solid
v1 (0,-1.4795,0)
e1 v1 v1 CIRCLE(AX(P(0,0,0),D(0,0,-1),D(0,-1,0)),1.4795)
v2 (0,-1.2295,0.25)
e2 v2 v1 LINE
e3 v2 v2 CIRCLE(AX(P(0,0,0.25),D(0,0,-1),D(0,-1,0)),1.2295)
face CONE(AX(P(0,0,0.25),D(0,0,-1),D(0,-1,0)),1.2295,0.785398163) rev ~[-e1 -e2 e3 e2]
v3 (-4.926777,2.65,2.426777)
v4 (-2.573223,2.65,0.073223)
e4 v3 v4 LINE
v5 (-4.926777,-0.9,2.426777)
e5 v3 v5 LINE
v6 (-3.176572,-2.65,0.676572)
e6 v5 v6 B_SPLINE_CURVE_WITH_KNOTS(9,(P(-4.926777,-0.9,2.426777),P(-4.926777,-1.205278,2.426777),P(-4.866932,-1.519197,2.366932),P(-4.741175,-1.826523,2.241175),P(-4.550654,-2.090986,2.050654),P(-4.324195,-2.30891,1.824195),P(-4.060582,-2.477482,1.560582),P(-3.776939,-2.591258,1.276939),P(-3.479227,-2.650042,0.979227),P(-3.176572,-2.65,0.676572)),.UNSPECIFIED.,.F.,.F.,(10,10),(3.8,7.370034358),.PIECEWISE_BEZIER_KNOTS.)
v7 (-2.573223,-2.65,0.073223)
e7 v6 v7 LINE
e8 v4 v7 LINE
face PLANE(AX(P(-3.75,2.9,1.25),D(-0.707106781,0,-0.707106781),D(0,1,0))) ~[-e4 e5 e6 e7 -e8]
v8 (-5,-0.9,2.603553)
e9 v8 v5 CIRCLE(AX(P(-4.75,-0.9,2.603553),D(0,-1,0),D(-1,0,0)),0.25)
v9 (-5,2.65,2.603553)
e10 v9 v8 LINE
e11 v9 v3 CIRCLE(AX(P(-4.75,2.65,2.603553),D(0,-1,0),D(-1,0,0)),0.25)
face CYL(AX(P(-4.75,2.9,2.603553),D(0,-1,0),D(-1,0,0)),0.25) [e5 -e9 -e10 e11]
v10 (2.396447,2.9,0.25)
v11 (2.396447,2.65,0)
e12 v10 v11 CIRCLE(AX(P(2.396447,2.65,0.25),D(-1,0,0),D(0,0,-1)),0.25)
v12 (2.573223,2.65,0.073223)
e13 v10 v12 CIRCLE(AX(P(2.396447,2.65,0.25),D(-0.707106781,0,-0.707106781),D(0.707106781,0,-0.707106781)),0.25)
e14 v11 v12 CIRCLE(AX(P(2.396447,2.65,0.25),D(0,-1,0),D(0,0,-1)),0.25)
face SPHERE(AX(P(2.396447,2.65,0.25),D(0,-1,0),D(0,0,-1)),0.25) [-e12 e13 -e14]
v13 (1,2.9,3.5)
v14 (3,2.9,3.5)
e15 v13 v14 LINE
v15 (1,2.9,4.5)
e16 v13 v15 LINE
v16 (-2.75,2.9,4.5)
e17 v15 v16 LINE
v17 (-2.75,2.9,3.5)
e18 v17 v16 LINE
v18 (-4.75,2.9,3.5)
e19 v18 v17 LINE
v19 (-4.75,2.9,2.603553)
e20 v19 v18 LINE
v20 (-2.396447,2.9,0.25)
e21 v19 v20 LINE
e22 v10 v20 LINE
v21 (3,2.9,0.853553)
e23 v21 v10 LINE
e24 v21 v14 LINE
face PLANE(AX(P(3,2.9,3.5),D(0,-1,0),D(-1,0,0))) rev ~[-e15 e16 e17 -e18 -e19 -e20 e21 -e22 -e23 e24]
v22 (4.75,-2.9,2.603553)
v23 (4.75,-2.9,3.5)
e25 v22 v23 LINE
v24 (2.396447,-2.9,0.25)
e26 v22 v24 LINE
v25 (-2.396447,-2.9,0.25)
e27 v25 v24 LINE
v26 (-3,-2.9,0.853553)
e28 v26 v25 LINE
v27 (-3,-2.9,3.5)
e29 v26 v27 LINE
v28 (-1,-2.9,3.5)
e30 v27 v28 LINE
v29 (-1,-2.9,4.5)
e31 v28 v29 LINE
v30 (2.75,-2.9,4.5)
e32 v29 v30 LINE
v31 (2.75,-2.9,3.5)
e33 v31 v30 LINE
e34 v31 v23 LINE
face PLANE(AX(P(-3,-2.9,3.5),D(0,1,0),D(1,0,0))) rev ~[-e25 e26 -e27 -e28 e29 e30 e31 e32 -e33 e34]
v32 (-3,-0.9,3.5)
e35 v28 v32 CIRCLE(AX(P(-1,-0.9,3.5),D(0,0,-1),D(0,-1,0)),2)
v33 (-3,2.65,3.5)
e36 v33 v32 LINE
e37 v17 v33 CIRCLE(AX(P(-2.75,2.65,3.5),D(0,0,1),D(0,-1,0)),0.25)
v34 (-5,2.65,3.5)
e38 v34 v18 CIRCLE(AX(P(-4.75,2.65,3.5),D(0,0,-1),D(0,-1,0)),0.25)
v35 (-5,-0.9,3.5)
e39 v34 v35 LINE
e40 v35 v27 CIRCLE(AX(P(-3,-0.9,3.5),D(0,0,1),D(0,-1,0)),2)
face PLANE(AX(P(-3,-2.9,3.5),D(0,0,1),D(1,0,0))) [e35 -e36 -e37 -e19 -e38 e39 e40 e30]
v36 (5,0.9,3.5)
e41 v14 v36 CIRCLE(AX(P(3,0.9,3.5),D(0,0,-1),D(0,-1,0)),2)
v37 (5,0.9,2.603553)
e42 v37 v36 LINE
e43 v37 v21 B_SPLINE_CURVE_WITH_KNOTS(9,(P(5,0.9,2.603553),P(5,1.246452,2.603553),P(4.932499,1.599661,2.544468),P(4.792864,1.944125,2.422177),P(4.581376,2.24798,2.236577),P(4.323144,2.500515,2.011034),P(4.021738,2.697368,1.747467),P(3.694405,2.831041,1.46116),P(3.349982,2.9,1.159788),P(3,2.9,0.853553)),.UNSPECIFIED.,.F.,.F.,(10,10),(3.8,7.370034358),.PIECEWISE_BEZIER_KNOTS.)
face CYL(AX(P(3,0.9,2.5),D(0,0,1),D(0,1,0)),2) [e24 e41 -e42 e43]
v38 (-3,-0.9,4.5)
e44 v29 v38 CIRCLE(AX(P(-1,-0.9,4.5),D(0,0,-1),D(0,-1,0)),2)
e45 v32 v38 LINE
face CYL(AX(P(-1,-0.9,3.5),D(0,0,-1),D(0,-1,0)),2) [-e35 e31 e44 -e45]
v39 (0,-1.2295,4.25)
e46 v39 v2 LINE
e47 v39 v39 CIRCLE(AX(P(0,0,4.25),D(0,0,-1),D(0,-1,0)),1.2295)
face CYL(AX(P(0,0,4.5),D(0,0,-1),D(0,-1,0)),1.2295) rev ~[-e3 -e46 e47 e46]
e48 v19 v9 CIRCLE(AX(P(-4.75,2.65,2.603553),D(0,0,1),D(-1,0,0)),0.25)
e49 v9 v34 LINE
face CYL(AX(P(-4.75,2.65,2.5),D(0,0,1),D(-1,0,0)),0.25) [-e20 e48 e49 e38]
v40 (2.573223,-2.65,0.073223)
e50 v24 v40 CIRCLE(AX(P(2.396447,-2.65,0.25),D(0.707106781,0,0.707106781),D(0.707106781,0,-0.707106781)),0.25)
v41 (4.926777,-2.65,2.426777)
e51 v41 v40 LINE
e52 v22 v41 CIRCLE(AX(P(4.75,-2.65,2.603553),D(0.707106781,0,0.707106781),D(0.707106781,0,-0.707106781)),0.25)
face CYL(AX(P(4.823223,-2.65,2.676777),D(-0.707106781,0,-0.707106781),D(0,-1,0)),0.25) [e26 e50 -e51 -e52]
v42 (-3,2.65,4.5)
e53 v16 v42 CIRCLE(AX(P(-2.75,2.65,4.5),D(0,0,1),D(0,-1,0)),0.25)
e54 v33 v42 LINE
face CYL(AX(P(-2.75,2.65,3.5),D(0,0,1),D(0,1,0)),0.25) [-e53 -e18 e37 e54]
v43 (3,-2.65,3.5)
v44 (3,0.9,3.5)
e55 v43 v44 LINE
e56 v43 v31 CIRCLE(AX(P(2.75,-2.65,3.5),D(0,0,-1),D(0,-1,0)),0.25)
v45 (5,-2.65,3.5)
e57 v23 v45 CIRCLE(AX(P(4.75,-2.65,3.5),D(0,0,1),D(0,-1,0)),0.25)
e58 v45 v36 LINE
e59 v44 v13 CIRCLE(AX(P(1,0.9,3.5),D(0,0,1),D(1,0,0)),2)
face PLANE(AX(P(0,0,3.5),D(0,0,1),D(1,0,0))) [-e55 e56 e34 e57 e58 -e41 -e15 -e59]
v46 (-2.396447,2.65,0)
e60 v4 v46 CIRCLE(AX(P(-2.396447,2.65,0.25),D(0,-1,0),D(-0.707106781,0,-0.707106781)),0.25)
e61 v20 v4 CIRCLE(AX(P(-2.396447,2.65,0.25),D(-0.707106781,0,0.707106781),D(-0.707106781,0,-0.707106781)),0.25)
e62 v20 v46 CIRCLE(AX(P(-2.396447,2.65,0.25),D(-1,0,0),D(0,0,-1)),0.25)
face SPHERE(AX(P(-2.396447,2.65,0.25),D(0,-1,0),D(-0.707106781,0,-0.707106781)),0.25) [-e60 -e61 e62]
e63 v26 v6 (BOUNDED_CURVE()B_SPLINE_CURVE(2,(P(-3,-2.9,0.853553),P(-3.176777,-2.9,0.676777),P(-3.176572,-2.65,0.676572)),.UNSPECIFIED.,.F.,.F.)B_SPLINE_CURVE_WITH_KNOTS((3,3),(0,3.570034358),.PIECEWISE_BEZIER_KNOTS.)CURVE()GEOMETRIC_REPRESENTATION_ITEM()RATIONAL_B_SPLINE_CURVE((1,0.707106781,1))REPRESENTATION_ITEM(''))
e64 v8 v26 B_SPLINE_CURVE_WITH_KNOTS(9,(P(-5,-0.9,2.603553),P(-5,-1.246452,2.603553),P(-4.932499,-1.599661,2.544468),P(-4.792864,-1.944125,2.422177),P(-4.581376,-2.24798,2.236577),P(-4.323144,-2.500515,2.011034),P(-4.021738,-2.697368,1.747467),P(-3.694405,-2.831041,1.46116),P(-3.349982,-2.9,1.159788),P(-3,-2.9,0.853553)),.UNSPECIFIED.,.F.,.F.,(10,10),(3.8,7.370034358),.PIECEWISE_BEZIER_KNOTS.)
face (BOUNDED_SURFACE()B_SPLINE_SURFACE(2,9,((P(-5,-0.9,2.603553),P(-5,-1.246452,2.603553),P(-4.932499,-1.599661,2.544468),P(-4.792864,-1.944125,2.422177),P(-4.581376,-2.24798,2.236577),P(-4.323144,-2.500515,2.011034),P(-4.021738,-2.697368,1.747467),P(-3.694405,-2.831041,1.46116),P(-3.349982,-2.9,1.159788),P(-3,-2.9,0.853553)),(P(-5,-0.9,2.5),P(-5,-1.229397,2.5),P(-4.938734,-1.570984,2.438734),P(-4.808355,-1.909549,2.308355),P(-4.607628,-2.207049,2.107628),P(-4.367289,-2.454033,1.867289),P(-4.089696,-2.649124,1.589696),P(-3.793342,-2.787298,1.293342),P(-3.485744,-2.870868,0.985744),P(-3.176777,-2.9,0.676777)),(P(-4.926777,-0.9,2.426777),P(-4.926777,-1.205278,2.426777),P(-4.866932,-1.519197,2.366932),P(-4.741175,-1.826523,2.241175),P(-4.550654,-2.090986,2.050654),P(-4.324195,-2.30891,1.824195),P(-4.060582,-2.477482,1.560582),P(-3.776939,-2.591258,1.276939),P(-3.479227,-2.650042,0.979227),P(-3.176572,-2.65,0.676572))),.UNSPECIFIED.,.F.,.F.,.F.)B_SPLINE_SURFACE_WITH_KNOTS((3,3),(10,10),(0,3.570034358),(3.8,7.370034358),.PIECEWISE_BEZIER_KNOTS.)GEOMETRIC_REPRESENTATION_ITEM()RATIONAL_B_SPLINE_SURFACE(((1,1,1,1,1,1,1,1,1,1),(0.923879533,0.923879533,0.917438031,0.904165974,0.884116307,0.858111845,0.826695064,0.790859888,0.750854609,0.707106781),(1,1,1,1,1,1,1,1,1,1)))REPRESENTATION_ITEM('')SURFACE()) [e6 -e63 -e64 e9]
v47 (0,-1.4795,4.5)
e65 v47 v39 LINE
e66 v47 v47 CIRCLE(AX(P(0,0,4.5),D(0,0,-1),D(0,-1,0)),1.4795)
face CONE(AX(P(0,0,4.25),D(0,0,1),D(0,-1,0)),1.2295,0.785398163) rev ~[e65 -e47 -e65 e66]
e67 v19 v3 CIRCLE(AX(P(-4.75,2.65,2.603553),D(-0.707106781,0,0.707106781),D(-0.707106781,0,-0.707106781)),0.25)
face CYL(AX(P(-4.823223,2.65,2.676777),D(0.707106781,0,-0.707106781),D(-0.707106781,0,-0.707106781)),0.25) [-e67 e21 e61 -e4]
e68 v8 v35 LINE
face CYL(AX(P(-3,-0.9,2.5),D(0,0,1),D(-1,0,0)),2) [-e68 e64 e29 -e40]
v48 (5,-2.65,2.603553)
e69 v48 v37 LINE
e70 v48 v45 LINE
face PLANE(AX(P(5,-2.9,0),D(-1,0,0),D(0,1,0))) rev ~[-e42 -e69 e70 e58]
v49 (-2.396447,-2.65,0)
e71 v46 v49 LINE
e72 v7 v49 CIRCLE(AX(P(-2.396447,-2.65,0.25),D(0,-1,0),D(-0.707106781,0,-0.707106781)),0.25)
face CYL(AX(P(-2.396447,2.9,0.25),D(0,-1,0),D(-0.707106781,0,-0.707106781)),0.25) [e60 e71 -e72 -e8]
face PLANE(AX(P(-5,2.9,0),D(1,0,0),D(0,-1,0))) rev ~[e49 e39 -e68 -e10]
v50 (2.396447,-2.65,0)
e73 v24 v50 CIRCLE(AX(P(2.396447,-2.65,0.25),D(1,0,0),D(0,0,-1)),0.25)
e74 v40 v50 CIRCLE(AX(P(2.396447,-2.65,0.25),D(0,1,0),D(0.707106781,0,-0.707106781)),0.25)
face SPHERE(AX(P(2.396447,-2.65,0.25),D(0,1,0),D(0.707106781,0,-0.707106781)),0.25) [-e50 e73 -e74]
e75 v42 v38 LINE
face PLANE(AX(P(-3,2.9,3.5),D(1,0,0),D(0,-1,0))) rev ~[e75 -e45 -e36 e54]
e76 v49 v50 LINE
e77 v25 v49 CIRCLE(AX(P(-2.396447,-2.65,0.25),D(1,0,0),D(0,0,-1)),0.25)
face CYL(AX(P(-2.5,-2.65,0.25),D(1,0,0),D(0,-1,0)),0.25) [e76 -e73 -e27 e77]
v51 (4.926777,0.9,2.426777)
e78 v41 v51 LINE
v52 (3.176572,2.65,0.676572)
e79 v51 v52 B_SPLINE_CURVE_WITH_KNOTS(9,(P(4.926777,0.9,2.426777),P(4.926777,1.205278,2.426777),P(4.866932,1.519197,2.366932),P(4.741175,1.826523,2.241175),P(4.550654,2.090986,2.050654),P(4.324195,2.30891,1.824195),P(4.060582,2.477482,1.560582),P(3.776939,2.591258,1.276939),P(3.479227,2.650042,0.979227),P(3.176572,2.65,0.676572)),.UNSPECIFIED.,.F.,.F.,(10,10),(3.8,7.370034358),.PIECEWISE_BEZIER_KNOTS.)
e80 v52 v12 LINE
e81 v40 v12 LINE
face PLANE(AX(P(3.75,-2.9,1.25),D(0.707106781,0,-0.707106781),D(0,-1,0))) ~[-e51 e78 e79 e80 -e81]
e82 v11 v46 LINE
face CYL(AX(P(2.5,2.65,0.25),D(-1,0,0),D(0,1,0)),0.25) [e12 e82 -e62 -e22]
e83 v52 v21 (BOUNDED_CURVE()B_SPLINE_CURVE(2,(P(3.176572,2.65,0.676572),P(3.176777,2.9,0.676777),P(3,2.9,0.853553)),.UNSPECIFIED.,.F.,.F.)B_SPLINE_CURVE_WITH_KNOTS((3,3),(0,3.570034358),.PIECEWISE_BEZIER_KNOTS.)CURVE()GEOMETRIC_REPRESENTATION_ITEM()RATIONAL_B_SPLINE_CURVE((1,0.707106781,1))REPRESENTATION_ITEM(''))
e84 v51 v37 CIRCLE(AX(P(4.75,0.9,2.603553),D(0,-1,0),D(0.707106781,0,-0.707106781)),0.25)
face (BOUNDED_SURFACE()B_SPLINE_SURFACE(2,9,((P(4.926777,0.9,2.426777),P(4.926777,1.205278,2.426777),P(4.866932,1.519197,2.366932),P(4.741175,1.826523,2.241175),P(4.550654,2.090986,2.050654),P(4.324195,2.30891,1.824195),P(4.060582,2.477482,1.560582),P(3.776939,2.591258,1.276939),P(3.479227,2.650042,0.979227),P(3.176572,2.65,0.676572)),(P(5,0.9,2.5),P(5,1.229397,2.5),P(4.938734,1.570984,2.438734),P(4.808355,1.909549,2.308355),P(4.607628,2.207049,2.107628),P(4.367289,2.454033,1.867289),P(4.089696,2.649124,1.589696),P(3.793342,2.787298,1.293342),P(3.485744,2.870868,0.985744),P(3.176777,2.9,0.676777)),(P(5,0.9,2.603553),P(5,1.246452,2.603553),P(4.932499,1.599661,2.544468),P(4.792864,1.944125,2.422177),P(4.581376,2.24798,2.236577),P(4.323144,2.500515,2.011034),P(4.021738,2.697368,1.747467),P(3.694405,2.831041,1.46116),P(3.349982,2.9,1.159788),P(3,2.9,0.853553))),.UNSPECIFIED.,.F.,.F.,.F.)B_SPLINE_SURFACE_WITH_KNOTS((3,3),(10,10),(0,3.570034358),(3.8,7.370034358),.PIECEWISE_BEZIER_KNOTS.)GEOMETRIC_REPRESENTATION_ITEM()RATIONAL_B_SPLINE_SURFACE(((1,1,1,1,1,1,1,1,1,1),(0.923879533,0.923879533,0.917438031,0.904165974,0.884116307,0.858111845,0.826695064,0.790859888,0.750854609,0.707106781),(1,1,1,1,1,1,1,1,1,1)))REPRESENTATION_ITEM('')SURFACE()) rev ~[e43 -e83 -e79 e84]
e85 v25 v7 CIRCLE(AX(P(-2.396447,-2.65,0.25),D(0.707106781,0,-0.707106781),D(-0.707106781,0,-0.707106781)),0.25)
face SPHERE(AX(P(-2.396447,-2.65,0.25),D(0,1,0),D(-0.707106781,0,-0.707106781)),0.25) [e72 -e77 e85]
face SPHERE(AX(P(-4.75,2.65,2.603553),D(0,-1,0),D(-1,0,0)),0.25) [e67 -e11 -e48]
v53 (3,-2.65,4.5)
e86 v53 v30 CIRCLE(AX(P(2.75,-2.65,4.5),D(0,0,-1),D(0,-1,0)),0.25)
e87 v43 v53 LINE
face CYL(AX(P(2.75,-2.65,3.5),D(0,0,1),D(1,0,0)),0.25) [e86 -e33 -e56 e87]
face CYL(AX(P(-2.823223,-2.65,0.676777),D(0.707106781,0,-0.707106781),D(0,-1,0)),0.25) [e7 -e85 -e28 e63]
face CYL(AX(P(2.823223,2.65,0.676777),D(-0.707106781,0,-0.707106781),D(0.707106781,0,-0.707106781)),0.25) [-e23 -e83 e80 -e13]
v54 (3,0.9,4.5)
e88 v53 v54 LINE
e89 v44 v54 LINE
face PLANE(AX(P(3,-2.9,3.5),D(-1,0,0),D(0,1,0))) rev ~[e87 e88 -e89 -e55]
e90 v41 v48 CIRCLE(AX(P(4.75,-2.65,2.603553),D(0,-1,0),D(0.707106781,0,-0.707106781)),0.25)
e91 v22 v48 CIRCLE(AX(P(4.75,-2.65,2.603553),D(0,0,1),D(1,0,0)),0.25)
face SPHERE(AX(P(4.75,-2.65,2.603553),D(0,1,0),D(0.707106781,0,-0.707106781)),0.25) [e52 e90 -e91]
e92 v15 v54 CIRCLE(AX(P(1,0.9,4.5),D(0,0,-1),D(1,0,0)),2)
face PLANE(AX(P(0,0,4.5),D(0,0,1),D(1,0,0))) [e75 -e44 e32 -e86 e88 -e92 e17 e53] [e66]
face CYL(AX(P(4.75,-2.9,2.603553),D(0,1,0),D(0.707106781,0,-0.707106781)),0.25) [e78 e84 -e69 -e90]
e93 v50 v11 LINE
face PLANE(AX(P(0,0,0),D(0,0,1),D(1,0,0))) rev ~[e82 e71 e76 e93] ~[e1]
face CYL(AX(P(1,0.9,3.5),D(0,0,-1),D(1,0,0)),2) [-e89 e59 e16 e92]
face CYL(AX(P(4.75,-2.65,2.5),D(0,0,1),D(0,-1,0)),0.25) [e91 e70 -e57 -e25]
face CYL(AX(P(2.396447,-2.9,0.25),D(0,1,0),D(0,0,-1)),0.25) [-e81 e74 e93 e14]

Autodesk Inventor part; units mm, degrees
ref_plane "YZ Plane" through (0, 0, 0) normal (1, 0, 0) x (0, 1, 0)
ref_plane "XZ Plane" through (0, 0, 0) normal (0, 1, 0) x (-1, 0, 0)
ref_plane "XY Plane" through (0, 0, 0) normal (0, 0, 1) x (1, 0, 0)
sketch "Esquisse1" plane through (0, 0, 0) normal (0, 0, 1) x (1, 0, 0)
  line L0 (-5, -2.9) -> (5, -2.9)
  line L1 (5, -2.9) -> (5, 2.9)
  line L2 (5, 2.9) -> (-5, 2.9)
  line L3 (-5, 2.9) -> (-5, -2.9)
  line L4 (-5, -2.9) -> (5, 2.9) construction
  line L5 (5, -2.9) -> (-5, 2.9) construction
  point P0 (0, 0)
  dimension "d0" = 10
  dimension "d1" = 5.8
extrude "Extrusion1" add sketch "Esquisse1" along normal blind 3.5
chamfer "Chanfrein1" distance 2.5 angle 45 2 edges at (5, 0, 0) (-5, 0, 0)
fillet "Congé1" radius 2 2 edges at (5, 2.9, 3) (-5, -2.9, 3)
fillet "Congé2" radius 0.25 12 edges at (0, 2.9, 0) (5, -1, 2.5) (4.4142, 2.3142, 1.9142) (3.75, -2.9, 1.25) (0, -2.9, 0) (2.5, 0, 0) (-2.5, 0, 0) (-3.75, 2.9, 1.25) (-5, 1, 2.5) (-4.4142, -2.3142, 1.9142) (-5, 2.9, 3) (5, -2.9, 3)
sketch "Esquisse2" plane through (0, 0, 3.5) normal (0, 0, 1) x (1, 0, 0)
  line L0 (3, 2.9) -> (-3, 2.9)
  line L1 (-3, 2.9) -> (-3, -2.9)
  line L2 (-3, -2.9) -> (3, -2.9)
  line L3 (3, -2.9) -> (3, 2.9)
  line L4 (3, 2.9) -> (-3, -2.9) construction
  line L5 (-3, 2.9) -> (3, -2.9) construction
  line L6 (-3, -2.9) -> (4.75, -2.9) projected
  point P0 (0, 0)
  dimension "d9" = 6
extrude "Extrusion2" add sketch "Esquisse2" along normal blind 1
fillet "Congé3" radius 2 2 edges at (3, 2.9, 4) (-3, -2.9, 4)
fillet "Congé4" radius 0.25 2 edges at (-3, 2.9, 4) (3, -2.9, 4)
sketch "Esquisse3" plane through (0, 0, 4.5) normal (0, 0, 1) x (1, 0, 0)
  point P0 (0, 0)
  point P1 (0, 0)
hole "Perçage1" at (0, 0, 4.5) direction (0, 0, -1) diameter 2.459 depth 8.8 tip angle 118 thread size "M3x0.5" class "6H" standard "ISO Metric profile"
chamfer "Chanfrein2" distance 0.25 angle 45 2 edges at (0, 1.2295, 4.5) (0, 1.2295, 0)
properties part number "Noix M3" material "Acier inoxydable"
